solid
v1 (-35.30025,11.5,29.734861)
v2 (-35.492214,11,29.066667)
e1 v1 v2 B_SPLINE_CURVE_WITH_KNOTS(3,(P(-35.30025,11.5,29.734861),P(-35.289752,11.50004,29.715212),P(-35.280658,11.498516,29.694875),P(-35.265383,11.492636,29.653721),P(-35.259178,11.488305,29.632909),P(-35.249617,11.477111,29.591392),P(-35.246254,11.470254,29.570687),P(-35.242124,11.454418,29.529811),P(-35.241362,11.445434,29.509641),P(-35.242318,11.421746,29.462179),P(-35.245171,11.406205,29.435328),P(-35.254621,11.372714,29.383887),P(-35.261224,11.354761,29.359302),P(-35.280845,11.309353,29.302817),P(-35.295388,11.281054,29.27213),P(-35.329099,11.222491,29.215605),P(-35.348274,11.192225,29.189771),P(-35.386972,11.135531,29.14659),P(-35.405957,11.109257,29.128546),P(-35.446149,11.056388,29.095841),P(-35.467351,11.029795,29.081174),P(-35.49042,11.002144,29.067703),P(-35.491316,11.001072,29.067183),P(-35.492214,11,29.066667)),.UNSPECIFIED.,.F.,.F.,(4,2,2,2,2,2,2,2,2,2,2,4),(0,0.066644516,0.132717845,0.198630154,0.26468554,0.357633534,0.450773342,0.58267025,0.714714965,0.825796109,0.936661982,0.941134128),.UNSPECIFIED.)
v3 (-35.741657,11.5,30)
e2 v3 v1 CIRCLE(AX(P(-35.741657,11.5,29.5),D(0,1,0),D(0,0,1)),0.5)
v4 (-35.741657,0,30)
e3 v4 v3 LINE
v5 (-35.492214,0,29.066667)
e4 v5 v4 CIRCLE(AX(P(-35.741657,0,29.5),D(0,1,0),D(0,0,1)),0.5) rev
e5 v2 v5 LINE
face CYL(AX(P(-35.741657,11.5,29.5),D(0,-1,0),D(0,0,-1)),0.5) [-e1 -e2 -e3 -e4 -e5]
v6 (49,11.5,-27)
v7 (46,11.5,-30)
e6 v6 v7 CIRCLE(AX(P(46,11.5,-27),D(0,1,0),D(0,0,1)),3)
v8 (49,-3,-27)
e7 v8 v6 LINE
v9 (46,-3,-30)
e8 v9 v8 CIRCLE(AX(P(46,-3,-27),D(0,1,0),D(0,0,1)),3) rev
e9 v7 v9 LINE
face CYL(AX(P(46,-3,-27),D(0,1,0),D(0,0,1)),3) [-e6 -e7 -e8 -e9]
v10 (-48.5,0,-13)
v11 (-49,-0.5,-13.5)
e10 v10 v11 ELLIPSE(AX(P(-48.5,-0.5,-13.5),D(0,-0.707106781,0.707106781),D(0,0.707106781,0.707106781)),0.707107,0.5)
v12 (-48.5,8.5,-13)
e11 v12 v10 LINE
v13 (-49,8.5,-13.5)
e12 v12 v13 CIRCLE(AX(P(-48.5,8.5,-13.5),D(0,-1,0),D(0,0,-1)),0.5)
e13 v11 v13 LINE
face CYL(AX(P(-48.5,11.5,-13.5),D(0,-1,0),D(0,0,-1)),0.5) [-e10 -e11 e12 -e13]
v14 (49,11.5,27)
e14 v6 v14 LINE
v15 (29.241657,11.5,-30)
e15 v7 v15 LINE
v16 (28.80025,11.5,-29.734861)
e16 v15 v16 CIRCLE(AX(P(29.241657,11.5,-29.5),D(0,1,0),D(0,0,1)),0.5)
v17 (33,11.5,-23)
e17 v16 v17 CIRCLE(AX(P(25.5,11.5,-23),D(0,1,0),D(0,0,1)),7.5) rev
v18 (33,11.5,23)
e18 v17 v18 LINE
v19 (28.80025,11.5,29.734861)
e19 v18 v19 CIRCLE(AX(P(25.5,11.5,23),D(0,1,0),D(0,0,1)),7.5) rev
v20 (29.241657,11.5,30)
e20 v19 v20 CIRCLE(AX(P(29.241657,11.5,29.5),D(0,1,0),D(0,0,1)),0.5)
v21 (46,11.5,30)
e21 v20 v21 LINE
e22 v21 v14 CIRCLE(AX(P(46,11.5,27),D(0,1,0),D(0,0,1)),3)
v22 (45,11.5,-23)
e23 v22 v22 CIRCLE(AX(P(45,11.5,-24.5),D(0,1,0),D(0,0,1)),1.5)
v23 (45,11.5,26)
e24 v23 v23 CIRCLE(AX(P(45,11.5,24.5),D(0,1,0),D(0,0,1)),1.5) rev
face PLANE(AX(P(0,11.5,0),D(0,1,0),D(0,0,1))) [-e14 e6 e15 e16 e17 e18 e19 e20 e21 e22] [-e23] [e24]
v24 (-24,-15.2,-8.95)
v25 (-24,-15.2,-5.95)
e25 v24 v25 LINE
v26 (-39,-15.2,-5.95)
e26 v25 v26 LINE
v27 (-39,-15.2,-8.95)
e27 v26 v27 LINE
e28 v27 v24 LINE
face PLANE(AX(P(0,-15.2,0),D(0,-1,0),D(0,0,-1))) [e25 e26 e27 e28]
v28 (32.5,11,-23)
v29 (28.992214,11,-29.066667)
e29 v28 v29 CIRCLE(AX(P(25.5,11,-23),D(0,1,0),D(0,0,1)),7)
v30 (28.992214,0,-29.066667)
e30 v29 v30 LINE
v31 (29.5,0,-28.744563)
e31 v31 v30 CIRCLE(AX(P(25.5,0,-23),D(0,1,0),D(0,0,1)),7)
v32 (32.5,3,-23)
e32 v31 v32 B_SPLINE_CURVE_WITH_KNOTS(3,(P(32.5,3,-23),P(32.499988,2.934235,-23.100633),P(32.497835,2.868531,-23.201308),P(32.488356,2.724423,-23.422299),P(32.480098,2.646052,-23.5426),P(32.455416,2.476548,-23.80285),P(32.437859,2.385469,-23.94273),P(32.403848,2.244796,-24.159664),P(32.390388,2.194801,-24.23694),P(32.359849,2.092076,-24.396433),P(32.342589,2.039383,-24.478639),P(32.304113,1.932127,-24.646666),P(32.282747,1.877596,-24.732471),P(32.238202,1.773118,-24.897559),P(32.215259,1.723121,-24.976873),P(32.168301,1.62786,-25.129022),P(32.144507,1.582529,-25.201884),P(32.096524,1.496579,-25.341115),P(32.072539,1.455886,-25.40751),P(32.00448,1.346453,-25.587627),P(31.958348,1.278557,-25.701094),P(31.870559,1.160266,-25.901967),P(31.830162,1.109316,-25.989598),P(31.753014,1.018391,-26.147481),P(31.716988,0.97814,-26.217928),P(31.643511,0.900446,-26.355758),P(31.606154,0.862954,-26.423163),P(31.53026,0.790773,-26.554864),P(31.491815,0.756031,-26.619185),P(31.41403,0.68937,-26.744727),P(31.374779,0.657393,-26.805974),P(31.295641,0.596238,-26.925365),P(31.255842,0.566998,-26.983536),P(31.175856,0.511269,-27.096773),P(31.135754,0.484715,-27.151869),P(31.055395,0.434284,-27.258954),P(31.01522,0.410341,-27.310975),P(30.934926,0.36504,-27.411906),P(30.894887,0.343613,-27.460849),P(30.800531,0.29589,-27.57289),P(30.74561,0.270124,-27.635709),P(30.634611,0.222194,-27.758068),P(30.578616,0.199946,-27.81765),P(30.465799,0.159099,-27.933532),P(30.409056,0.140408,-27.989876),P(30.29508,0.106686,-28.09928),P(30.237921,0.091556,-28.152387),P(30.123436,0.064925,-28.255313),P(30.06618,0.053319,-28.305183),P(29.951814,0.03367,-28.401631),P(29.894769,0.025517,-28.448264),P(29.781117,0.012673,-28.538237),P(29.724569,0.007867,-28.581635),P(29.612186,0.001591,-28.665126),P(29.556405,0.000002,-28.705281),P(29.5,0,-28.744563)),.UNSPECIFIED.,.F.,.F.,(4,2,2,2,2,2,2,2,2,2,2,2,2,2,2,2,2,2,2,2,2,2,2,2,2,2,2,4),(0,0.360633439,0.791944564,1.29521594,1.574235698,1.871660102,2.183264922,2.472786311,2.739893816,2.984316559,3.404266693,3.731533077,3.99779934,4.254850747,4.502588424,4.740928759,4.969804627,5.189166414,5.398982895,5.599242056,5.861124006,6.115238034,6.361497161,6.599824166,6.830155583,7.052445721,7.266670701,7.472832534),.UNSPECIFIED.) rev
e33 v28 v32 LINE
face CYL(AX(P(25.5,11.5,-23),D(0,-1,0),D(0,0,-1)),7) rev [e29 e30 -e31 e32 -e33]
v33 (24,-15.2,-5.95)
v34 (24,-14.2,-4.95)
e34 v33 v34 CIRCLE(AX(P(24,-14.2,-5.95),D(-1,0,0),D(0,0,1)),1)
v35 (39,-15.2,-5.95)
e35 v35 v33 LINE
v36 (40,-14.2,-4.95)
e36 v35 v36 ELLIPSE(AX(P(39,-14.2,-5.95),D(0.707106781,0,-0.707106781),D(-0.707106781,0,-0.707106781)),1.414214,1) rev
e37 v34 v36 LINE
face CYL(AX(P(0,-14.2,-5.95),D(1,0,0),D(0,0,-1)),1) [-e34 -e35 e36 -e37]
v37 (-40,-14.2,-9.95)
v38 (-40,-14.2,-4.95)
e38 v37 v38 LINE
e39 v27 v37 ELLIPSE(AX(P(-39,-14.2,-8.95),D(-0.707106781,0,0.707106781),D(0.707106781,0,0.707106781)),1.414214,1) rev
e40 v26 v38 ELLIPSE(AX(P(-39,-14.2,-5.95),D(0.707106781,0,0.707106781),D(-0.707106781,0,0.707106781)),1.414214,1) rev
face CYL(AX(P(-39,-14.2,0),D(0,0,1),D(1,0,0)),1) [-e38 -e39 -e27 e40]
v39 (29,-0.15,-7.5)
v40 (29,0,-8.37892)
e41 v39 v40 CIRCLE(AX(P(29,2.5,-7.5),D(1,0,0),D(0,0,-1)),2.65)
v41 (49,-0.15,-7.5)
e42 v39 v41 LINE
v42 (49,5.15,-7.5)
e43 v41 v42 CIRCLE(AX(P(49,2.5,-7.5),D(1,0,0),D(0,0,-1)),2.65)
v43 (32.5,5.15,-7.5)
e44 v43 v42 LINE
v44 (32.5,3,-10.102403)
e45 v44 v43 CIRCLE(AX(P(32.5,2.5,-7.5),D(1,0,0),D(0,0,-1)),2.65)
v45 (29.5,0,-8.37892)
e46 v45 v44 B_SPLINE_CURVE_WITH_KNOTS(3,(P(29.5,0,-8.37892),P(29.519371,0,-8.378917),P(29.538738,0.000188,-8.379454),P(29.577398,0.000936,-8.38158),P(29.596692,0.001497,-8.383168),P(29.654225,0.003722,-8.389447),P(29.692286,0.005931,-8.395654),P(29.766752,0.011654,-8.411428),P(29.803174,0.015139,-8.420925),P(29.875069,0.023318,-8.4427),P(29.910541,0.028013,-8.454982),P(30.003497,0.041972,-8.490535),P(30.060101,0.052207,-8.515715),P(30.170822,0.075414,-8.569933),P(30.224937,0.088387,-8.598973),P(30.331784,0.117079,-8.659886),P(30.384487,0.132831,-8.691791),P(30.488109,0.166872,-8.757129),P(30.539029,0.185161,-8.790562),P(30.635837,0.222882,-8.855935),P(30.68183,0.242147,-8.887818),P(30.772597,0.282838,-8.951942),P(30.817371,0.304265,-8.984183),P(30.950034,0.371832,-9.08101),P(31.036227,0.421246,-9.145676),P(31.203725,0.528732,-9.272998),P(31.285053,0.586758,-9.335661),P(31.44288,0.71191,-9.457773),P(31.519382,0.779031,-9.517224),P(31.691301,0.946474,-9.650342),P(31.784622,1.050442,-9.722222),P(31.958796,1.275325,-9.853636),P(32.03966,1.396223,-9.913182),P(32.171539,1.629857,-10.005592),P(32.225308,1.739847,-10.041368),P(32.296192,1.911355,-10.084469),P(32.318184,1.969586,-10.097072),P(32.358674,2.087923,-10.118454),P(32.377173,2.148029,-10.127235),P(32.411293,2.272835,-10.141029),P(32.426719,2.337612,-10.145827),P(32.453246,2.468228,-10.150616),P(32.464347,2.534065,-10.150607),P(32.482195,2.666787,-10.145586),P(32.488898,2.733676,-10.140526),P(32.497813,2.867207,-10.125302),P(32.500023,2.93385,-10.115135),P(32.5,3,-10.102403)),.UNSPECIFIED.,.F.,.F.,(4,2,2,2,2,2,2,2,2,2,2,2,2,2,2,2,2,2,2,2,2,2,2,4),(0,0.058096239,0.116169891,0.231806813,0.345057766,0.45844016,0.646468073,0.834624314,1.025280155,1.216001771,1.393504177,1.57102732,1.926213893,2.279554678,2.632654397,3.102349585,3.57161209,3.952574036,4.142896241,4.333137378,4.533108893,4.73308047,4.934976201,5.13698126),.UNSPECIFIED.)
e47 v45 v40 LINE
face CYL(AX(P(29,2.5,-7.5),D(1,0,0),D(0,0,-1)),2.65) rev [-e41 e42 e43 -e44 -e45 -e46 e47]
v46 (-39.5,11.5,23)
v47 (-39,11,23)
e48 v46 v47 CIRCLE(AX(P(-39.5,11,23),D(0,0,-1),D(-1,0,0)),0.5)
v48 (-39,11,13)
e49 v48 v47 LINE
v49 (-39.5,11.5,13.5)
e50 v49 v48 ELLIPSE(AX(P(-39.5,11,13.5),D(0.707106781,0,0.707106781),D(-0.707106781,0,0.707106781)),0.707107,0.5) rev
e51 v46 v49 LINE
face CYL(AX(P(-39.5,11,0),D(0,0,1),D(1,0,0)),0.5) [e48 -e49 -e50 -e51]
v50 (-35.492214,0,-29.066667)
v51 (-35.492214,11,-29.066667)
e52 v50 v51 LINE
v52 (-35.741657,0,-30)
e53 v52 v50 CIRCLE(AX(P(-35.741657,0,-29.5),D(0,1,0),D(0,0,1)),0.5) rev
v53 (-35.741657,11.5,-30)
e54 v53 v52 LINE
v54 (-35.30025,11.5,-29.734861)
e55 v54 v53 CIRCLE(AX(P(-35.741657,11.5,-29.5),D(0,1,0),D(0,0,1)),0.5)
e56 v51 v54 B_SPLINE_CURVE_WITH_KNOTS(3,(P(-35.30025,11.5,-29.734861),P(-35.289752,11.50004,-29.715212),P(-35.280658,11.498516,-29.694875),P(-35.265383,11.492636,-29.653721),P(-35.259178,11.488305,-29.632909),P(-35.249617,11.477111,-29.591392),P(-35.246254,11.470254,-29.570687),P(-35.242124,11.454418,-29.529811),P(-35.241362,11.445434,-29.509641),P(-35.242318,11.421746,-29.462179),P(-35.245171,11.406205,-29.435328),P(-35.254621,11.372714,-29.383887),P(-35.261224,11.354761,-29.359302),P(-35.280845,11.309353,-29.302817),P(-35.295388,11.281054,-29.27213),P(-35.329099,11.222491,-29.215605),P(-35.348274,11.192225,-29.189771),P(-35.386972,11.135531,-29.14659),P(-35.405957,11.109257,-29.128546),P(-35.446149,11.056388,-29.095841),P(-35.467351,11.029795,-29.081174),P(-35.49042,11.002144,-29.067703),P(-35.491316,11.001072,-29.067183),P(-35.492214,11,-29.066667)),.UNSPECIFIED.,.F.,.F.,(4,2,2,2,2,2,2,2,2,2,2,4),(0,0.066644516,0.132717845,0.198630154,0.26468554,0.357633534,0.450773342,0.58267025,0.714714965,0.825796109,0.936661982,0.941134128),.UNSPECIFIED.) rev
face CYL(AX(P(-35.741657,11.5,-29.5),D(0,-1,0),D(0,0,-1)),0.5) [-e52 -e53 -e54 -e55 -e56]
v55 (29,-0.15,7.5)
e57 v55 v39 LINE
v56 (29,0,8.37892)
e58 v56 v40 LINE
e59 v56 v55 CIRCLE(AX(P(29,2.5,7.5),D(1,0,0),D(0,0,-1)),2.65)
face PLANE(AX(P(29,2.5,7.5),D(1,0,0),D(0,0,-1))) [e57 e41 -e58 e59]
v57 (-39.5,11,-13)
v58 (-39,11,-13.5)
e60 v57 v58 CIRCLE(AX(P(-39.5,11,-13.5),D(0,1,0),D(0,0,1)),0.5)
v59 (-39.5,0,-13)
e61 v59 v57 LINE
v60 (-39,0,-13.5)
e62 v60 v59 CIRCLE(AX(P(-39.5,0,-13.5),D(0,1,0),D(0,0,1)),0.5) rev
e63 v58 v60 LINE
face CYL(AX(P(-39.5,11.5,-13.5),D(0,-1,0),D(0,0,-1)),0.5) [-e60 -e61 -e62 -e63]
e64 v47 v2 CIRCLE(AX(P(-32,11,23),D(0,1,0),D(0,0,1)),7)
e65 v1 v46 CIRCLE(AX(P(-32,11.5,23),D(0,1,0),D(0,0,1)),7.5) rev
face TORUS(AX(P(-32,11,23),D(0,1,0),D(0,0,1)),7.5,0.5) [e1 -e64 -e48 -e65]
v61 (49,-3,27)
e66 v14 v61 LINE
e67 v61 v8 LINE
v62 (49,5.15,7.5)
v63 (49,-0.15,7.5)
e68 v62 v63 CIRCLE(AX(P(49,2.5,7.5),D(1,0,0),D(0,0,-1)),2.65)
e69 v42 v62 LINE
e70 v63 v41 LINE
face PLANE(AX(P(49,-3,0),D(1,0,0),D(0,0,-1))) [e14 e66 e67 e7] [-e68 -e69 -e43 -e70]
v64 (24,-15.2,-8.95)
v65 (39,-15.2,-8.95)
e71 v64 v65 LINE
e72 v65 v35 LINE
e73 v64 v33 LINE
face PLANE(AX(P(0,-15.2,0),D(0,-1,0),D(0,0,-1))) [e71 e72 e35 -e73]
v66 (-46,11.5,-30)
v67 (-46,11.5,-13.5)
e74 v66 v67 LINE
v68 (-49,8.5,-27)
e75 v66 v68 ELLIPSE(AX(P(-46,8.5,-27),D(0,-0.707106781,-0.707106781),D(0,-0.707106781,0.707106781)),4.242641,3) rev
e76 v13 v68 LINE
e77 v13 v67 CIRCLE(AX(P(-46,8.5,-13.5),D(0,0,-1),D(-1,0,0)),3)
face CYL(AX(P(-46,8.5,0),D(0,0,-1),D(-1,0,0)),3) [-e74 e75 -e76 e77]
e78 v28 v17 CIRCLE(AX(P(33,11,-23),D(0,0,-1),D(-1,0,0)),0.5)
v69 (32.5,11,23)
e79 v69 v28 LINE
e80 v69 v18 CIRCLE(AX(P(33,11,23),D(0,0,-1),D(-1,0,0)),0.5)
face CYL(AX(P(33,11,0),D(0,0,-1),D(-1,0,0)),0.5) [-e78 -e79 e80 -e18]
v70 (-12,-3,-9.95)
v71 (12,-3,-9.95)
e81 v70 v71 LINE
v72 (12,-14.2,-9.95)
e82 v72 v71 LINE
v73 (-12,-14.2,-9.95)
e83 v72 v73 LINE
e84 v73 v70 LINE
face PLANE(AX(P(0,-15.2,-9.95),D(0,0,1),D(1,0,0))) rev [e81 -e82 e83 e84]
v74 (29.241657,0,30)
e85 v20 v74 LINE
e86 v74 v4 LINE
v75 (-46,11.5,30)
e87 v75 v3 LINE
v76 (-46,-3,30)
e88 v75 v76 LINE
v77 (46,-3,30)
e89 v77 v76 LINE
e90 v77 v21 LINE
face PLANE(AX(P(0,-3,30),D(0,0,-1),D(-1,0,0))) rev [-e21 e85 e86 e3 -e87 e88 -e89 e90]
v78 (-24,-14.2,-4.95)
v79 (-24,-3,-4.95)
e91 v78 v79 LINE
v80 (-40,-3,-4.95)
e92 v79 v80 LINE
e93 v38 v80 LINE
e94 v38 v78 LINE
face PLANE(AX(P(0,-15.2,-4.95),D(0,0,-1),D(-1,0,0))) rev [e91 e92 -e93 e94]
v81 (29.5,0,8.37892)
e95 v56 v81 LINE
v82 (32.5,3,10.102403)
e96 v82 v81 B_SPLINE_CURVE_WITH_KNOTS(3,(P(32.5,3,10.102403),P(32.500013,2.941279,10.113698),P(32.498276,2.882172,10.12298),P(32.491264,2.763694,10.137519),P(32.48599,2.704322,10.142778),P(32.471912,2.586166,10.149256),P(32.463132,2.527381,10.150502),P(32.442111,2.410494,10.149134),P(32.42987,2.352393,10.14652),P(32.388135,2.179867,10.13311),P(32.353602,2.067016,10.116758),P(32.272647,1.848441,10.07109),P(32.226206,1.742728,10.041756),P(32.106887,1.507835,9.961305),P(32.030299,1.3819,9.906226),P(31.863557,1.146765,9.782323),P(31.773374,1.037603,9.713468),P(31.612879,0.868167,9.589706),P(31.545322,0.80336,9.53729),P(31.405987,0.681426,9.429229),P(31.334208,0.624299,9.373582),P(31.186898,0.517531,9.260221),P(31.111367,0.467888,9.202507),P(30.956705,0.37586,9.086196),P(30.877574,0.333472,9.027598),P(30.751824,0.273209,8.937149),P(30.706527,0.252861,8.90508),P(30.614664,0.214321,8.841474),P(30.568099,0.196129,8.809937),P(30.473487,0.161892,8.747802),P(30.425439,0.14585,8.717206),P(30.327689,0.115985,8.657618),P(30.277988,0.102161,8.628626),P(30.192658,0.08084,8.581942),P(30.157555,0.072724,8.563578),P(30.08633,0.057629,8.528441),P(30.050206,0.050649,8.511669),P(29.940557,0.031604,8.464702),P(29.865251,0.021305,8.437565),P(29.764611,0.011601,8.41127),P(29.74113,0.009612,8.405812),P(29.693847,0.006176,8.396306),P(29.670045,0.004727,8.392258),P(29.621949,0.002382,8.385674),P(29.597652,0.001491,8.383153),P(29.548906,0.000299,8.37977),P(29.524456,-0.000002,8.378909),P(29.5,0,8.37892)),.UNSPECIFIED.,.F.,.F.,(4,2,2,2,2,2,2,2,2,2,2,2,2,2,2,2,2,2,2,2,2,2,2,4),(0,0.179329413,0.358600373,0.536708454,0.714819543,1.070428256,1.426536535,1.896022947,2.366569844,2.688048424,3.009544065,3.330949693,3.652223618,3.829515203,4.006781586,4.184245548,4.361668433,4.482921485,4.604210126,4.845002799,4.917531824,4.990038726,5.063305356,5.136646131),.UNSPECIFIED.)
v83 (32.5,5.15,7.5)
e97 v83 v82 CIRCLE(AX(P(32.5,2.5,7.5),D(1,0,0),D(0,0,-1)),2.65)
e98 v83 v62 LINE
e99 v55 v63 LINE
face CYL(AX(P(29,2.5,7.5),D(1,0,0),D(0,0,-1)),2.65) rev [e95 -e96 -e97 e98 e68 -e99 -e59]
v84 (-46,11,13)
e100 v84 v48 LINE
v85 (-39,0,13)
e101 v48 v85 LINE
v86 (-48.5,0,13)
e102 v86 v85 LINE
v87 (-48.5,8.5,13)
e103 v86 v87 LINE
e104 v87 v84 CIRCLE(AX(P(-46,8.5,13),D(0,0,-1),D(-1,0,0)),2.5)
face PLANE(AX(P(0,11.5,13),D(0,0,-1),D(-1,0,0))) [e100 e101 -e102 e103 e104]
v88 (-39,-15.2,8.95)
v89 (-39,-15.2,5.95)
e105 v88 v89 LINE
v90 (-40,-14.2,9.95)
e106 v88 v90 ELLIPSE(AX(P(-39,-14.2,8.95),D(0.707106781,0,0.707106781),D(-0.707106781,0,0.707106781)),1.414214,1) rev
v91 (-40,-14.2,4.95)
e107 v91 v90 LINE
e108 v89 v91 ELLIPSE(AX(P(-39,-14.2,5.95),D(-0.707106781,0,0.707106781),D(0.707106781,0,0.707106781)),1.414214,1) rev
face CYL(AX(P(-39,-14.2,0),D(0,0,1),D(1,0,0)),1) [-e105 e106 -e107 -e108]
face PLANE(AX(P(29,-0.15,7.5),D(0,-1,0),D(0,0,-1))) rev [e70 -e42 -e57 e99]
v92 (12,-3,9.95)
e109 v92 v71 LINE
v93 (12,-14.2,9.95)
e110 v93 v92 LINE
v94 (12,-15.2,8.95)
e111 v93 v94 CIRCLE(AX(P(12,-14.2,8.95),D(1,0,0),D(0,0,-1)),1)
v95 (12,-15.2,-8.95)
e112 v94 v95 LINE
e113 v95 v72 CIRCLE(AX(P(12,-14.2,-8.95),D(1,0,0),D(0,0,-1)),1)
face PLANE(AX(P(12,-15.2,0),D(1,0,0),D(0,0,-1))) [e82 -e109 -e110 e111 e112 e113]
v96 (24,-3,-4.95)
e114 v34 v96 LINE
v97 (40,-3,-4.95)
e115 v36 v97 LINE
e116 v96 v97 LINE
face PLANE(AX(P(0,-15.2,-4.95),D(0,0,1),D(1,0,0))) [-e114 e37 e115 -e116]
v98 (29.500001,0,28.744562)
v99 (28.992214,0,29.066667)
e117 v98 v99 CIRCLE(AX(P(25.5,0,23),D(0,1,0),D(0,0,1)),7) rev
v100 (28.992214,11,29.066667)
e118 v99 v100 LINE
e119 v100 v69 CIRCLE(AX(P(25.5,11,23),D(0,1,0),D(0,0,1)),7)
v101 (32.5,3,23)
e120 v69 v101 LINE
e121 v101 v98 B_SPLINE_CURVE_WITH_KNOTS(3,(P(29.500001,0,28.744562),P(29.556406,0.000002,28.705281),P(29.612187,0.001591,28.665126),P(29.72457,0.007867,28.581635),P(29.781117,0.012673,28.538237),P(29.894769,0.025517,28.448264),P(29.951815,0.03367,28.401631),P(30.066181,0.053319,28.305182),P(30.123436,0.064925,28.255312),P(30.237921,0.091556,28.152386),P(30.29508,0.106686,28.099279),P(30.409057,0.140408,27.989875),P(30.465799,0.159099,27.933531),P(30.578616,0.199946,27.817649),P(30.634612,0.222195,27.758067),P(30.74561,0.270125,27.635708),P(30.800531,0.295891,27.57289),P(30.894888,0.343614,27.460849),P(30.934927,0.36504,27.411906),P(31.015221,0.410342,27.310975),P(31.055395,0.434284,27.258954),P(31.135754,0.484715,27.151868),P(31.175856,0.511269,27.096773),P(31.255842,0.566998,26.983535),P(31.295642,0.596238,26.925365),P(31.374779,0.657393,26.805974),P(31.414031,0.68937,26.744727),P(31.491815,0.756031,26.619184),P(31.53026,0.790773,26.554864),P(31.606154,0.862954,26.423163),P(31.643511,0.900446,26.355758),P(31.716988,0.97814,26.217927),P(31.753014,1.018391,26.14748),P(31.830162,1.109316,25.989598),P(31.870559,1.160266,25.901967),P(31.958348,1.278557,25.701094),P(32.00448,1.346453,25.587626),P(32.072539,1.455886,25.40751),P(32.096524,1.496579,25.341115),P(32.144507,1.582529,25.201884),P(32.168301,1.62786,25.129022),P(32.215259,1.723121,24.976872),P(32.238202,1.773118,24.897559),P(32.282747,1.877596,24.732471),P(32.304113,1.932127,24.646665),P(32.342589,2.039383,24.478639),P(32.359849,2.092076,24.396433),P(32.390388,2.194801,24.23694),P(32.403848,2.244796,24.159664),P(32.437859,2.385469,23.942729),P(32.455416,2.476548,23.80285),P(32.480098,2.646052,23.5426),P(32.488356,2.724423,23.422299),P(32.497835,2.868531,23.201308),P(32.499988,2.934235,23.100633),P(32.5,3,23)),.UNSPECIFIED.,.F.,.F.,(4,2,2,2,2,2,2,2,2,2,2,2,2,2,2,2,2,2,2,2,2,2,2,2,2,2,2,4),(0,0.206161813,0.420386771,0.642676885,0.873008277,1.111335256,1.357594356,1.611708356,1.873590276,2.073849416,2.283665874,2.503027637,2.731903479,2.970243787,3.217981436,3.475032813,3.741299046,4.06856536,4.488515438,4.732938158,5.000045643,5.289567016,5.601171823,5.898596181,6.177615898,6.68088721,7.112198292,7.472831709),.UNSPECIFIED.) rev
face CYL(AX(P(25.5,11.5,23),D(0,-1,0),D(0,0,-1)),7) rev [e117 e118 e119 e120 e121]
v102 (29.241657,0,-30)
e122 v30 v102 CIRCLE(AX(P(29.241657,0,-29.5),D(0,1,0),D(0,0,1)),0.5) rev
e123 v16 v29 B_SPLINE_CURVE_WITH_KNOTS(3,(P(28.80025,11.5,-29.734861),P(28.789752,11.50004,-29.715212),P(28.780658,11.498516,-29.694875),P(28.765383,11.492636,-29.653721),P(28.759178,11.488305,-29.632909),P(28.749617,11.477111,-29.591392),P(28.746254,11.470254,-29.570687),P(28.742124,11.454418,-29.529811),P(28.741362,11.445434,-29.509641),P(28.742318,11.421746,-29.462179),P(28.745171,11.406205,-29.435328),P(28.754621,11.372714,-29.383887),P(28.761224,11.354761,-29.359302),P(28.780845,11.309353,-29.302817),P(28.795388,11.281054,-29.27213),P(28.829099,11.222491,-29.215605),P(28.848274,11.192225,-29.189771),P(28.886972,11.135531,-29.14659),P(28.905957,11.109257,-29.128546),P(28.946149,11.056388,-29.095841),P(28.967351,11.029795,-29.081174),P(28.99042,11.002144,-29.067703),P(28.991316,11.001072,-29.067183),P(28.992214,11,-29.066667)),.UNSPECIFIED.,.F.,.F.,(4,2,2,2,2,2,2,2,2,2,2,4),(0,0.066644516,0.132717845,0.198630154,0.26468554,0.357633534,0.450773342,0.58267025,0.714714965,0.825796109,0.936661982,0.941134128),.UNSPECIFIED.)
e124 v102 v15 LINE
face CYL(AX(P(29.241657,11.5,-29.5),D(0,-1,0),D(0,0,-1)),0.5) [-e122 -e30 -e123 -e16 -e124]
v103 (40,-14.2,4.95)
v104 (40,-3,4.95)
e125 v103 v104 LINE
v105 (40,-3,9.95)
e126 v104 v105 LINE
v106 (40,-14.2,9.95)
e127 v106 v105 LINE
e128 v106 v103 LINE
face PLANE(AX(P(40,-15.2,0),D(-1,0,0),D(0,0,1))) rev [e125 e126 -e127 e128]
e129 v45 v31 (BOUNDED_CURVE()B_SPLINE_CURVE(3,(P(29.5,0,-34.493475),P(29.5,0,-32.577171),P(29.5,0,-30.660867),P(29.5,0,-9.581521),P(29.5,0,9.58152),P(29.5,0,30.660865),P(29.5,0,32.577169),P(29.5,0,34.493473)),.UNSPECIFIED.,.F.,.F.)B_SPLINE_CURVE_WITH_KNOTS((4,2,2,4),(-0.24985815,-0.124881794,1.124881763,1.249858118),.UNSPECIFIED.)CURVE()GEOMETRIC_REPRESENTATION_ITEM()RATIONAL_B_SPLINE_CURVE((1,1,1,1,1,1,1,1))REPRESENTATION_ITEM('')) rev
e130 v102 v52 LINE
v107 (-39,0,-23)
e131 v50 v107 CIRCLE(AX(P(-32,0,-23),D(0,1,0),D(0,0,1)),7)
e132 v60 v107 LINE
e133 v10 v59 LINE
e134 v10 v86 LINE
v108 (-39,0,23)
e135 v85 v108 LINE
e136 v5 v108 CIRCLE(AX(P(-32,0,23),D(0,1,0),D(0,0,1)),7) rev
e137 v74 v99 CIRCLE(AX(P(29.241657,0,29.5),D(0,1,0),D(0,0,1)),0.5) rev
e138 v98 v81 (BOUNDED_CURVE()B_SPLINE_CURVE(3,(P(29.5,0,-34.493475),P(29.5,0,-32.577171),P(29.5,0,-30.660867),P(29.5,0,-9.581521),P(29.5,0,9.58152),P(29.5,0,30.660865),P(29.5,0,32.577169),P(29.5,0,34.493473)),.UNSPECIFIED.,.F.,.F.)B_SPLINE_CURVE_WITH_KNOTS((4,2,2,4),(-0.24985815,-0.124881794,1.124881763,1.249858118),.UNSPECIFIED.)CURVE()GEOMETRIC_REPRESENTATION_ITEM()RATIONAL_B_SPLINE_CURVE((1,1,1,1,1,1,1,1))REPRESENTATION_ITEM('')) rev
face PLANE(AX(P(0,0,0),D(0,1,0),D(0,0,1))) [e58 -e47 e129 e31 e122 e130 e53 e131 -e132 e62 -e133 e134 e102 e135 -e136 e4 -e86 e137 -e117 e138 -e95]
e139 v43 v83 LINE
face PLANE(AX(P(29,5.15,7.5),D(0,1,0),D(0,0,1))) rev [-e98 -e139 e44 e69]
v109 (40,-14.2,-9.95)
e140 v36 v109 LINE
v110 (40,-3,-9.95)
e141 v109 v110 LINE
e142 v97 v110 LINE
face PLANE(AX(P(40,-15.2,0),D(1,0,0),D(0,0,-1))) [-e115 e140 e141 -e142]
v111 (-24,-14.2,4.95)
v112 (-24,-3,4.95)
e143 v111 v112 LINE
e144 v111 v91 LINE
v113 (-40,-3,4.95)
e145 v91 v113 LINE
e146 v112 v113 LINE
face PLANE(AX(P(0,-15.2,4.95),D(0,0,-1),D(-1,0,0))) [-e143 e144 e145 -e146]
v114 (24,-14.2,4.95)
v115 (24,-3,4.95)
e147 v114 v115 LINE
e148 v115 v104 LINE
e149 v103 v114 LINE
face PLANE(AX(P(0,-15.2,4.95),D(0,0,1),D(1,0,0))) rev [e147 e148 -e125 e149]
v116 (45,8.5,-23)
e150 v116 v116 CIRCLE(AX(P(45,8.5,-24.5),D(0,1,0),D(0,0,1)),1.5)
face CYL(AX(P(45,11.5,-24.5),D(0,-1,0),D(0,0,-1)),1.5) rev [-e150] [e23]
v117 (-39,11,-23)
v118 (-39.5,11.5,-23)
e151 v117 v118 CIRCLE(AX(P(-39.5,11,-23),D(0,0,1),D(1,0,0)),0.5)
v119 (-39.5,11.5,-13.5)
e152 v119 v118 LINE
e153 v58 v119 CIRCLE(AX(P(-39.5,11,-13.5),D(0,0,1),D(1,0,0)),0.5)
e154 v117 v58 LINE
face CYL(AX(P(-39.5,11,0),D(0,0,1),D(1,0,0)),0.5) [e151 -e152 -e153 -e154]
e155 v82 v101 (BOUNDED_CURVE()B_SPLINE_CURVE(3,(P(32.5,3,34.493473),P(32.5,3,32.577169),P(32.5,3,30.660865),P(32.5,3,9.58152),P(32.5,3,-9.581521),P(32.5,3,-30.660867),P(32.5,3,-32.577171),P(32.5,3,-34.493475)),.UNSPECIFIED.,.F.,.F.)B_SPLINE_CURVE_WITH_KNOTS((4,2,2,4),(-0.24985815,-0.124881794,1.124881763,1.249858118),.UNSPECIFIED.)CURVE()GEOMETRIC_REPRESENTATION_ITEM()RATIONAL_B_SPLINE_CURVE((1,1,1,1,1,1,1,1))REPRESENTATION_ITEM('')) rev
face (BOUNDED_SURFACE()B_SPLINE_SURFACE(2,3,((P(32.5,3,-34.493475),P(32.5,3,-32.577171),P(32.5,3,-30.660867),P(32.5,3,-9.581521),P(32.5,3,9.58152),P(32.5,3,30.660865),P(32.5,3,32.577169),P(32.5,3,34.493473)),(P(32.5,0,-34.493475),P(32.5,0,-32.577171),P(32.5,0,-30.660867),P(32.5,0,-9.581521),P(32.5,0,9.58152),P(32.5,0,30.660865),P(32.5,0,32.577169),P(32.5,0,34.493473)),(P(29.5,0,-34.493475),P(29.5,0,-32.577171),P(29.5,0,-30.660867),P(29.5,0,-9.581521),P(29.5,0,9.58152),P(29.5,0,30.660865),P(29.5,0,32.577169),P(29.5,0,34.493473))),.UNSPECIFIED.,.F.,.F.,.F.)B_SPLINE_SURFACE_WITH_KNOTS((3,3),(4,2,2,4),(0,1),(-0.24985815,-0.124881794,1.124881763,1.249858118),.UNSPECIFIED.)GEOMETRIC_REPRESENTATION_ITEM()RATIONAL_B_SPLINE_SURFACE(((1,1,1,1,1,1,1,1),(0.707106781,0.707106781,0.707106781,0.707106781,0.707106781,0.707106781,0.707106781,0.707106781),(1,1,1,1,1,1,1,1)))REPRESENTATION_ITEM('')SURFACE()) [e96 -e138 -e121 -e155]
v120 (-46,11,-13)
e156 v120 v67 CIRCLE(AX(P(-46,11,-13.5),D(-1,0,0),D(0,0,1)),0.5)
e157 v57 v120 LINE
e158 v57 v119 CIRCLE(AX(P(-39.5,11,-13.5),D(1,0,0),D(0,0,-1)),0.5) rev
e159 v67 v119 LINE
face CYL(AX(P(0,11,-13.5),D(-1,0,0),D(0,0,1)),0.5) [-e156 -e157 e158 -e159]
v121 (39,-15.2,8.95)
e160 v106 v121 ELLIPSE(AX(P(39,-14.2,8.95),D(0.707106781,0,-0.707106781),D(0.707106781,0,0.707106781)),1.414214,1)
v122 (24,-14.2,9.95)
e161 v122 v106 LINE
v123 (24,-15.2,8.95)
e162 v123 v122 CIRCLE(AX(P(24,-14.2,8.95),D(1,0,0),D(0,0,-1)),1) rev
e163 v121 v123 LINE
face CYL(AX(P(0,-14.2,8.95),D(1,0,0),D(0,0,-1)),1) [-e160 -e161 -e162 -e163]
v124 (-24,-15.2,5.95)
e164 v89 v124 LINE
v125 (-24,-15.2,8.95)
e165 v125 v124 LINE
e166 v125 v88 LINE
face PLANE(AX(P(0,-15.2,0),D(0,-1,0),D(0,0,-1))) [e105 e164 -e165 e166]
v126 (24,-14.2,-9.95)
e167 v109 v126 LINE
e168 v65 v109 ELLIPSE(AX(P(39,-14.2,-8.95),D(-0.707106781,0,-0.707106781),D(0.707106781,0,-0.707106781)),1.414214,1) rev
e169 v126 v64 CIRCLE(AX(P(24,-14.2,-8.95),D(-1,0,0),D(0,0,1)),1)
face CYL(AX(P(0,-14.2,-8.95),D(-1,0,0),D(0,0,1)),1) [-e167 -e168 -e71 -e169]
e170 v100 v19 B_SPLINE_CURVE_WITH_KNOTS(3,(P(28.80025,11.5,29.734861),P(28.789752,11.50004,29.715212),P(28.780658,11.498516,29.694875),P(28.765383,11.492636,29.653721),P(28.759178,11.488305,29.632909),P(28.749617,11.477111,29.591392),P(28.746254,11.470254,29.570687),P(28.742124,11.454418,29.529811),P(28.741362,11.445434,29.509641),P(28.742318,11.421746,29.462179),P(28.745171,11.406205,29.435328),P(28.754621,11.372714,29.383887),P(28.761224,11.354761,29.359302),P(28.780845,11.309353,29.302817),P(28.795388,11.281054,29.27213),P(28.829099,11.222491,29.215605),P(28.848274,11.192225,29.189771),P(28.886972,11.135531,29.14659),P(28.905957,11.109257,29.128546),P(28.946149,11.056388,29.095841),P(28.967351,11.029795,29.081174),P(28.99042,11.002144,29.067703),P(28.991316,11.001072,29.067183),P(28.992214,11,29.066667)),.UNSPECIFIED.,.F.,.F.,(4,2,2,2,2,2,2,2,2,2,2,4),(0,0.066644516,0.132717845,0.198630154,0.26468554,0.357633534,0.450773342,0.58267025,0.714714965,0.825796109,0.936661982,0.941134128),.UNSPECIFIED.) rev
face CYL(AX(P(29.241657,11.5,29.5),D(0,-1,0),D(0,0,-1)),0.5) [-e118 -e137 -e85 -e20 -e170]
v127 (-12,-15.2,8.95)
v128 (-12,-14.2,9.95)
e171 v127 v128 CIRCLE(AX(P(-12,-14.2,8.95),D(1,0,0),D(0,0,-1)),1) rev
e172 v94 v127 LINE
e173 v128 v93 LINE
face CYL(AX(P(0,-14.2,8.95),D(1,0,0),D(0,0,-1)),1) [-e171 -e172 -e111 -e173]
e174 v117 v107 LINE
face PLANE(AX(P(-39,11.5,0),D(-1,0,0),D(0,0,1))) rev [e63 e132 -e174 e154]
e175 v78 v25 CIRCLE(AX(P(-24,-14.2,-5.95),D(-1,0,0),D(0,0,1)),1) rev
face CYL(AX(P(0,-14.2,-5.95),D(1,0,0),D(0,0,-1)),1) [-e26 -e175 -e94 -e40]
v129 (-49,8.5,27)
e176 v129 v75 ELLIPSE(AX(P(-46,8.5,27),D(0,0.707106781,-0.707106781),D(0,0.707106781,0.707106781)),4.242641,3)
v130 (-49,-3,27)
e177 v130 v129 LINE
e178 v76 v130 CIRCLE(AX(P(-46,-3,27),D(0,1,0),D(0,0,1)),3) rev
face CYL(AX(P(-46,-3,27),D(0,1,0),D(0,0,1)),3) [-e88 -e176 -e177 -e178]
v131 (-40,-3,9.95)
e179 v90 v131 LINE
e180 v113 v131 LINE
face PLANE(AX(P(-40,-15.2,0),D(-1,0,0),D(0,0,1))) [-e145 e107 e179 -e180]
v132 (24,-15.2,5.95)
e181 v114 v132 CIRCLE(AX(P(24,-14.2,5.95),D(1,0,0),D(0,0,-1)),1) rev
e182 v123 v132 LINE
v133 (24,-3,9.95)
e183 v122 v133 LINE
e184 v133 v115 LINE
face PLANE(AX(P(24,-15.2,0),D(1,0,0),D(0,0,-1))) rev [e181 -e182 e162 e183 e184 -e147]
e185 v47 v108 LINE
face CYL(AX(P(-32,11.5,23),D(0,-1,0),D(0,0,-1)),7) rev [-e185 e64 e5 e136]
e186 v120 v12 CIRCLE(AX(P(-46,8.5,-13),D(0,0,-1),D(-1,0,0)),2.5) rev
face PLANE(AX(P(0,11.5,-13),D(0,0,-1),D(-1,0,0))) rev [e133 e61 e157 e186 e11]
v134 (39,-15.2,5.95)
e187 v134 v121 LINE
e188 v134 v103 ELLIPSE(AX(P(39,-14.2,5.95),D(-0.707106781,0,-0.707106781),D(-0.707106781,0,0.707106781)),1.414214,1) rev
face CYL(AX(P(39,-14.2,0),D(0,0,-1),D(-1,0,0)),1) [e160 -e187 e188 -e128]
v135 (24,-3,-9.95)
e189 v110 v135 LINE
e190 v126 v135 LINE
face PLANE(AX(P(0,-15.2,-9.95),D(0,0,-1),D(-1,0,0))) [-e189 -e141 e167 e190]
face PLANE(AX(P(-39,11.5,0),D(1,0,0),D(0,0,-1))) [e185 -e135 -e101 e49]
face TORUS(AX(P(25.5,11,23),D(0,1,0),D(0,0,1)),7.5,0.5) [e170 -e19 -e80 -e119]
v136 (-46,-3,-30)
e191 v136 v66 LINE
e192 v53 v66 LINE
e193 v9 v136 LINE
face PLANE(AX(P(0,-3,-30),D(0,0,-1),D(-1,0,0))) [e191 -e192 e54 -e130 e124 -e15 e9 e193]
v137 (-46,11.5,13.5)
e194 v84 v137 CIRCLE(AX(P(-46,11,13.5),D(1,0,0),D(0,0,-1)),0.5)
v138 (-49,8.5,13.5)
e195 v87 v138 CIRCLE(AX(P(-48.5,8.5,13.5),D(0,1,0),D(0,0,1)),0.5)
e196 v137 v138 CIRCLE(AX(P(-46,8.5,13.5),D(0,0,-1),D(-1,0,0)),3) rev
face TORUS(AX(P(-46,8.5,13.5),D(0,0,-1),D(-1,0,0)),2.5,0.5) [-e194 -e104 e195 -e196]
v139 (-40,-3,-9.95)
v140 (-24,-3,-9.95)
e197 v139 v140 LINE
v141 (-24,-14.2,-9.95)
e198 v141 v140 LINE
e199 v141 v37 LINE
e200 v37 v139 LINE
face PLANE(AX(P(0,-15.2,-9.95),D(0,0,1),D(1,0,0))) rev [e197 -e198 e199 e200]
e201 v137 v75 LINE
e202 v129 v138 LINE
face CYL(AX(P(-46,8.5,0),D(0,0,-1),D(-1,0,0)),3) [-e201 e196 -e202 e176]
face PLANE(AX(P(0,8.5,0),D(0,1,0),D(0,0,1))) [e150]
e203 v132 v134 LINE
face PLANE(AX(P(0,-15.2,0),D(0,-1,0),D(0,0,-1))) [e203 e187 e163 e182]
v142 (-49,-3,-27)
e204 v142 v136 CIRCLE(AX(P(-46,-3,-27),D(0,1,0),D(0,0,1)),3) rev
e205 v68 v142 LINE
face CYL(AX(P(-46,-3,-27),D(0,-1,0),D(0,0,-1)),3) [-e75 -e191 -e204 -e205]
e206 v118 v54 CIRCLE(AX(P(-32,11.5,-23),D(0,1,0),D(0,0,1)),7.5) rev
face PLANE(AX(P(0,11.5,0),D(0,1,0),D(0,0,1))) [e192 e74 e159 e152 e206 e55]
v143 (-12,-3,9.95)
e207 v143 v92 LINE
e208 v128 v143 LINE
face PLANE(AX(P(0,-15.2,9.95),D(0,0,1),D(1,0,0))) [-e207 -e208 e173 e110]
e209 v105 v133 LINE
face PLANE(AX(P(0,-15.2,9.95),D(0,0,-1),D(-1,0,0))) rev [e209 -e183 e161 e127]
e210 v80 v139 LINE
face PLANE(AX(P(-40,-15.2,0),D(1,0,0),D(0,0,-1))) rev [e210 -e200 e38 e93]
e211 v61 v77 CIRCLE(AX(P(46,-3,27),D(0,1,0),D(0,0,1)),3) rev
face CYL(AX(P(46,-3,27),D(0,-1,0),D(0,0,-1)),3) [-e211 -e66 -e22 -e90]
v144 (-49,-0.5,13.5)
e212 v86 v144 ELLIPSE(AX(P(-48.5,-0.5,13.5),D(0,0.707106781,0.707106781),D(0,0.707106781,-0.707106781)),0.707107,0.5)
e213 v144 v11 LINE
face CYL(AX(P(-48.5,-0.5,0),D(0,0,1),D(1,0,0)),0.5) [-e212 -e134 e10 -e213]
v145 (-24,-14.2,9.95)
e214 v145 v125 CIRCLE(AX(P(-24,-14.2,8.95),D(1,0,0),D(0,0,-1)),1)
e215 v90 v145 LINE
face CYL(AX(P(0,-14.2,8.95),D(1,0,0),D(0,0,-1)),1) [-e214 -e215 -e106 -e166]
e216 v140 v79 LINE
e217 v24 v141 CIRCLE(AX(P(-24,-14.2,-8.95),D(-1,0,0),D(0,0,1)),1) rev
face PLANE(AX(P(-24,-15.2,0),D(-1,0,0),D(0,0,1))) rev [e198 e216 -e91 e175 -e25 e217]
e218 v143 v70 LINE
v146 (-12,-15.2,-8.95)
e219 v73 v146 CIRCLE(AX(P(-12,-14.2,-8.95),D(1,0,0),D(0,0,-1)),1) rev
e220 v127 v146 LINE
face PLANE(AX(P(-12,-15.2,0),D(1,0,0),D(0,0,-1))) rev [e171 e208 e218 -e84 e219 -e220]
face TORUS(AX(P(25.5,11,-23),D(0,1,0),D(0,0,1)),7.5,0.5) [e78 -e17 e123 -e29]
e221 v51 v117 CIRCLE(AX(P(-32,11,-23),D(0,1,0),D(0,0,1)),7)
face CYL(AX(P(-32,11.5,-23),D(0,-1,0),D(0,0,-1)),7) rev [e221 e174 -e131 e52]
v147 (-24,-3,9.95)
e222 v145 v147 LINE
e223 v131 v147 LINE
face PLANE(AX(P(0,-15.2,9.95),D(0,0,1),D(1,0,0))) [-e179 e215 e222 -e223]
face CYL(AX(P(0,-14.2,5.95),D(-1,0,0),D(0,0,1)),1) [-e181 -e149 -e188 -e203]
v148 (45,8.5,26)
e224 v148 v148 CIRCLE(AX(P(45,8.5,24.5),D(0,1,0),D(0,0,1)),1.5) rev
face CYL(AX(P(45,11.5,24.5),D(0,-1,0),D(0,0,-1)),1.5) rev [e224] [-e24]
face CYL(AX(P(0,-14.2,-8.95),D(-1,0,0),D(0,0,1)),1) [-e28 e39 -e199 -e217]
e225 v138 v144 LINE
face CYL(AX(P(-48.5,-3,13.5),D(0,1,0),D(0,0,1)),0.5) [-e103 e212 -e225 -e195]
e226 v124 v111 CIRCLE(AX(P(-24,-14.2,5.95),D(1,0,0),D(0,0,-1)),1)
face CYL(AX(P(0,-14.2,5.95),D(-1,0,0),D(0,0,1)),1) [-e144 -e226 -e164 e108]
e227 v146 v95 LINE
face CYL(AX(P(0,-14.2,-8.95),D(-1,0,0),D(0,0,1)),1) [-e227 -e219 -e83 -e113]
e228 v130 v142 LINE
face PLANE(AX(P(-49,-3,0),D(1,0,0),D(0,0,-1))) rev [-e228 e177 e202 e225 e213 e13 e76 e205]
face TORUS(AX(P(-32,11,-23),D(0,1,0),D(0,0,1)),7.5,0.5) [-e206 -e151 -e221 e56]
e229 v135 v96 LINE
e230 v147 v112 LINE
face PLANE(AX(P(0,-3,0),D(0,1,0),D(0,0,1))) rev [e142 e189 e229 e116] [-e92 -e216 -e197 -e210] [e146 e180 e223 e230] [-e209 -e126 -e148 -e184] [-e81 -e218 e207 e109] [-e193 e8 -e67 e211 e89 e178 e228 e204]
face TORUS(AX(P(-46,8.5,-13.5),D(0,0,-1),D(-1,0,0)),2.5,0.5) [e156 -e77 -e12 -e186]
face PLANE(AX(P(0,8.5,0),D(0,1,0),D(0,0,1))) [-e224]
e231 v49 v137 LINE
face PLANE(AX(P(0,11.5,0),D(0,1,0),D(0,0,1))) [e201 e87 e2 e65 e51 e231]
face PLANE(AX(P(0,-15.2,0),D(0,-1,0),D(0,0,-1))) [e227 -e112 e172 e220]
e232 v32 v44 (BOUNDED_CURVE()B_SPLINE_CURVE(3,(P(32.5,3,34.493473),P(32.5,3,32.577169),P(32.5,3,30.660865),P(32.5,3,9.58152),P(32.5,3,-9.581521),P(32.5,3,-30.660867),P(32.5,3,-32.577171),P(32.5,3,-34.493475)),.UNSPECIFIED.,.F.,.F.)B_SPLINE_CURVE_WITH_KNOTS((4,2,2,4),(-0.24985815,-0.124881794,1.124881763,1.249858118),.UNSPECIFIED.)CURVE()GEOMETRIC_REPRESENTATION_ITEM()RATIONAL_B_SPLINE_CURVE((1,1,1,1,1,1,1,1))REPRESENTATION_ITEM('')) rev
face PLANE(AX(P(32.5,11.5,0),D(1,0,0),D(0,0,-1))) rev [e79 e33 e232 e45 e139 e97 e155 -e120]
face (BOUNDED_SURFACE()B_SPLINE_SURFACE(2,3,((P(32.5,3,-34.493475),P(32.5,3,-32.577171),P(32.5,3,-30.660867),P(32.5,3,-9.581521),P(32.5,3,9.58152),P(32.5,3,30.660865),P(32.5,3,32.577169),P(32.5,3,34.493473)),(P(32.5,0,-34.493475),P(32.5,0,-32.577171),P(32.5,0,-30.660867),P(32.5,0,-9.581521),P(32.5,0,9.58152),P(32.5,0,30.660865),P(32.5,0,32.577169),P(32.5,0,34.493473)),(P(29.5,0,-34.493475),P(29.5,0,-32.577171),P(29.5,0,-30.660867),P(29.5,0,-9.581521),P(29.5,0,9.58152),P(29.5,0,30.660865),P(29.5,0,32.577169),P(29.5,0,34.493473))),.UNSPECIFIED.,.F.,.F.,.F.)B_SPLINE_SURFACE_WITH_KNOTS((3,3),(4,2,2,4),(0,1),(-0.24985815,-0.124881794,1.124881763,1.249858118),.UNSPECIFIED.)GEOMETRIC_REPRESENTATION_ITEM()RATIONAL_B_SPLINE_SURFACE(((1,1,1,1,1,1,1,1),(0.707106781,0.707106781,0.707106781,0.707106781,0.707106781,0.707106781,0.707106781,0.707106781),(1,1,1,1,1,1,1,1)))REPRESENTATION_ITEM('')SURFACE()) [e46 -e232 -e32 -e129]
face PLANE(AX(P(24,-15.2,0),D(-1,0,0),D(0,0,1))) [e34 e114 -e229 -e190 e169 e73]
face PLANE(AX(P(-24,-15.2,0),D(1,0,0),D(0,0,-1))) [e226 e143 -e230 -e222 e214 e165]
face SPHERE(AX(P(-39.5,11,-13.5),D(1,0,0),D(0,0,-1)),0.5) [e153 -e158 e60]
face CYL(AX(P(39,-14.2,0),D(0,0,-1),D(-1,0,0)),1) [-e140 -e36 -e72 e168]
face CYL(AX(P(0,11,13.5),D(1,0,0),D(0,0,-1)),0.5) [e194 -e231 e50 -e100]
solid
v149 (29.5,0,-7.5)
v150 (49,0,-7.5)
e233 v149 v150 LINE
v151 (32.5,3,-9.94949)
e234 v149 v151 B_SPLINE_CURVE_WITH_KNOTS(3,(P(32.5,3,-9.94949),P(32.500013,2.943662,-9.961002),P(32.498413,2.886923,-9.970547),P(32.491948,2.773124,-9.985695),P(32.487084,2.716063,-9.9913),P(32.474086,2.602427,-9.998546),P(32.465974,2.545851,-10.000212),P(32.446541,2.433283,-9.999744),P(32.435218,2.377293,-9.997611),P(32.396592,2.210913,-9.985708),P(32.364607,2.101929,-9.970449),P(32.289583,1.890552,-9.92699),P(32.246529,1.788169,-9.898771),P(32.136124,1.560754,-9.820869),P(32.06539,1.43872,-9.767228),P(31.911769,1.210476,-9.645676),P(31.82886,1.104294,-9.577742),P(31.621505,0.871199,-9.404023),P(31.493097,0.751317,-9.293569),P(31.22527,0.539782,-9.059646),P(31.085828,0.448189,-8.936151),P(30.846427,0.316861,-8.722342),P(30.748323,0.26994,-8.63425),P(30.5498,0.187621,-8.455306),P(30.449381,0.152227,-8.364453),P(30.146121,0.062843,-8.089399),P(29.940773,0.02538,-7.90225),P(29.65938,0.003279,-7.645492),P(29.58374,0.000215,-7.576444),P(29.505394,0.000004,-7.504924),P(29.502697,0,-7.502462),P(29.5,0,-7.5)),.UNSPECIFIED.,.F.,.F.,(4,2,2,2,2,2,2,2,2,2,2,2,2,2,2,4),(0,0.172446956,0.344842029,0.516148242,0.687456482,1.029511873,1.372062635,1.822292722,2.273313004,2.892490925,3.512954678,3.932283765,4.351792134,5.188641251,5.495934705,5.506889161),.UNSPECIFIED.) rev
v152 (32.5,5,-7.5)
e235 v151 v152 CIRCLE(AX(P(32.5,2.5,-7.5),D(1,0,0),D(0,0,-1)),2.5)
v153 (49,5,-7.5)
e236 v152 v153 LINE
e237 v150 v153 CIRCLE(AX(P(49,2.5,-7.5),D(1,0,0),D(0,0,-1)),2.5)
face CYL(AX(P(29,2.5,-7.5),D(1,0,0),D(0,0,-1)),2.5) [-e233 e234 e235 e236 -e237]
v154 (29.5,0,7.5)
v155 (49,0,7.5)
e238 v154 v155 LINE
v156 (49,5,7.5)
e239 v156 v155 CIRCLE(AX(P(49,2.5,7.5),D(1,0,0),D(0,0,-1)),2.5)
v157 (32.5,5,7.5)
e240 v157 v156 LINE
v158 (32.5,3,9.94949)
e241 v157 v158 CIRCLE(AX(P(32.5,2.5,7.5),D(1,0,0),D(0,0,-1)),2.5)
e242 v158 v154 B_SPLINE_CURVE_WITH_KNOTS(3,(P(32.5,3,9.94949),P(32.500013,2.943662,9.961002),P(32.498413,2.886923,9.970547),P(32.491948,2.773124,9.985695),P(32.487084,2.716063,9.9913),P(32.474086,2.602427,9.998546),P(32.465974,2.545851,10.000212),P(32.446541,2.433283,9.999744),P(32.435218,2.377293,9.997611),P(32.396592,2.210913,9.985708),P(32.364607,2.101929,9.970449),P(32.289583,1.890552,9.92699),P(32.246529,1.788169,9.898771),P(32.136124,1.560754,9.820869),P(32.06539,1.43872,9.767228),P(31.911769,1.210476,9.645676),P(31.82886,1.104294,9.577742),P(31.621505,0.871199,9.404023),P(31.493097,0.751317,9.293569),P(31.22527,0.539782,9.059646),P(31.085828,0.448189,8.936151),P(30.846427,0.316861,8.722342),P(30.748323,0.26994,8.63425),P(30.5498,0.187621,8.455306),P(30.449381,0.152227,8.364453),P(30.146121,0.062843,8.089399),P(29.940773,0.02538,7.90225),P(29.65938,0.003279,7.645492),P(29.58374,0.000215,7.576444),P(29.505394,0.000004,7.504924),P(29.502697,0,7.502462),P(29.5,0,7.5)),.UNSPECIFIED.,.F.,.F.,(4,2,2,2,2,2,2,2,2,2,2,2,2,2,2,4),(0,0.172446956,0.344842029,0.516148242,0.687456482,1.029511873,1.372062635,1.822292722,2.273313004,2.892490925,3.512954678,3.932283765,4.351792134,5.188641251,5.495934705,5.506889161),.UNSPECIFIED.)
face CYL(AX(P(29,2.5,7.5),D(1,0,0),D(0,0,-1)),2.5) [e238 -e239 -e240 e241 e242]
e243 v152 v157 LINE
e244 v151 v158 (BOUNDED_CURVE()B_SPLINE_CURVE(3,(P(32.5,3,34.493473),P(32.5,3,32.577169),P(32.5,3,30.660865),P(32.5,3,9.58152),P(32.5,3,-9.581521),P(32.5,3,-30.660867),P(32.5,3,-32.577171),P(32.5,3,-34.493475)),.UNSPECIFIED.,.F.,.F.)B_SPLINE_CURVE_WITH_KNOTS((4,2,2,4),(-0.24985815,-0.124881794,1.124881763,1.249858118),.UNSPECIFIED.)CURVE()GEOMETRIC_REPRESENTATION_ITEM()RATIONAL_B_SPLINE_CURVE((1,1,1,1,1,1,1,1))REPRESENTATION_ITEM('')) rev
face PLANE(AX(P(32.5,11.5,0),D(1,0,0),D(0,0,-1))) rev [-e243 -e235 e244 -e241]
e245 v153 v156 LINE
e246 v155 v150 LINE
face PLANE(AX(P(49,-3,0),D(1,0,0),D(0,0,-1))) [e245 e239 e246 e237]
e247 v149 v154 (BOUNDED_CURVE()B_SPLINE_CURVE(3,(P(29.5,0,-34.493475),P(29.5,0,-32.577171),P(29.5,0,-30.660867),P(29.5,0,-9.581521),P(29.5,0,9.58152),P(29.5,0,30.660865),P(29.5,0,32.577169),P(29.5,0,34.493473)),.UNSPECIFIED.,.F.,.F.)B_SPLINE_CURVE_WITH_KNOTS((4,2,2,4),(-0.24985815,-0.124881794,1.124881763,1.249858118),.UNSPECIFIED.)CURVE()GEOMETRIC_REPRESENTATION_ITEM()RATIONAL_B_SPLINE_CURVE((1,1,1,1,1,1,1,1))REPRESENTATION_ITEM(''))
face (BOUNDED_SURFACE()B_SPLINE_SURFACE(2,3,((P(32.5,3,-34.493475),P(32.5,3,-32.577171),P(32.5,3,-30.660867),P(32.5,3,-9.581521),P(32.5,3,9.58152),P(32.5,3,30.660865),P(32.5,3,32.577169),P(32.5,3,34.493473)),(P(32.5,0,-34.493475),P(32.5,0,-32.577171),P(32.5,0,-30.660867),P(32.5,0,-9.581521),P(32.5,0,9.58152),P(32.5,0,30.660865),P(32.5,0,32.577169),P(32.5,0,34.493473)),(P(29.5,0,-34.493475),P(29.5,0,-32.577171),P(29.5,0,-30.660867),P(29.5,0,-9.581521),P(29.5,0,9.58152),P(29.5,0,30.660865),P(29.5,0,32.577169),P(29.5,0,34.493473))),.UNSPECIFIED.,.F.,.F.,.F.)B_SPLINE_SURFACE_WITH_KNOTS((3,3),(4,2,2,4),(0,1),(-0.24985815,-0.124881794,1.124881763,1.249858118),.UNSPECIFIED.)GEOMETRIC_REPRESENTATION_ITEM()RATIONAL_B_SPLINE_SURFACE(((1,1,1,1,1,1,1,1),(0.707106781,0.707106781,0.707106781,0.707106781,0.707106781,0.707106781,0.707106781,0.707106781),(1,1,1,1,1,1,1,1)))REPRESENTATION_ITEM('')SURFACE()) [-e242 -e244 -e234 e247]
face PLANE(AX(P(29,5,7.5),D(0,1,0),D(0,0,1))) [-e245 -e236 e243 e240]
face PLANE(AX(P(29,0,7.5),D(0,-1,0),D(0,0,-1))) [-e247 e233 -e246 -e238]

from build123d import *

# Parameters (mm, degrees)
SKETCH1_W           = 13.75
SKETCH1_H           = 49
SKETCH1_W_2         = 16.25
BOSS_EXTRUDE1_DEPTH = 3
SKETCH8_W           = 16
SKETCH8_H           = 5
SKETCH8_W_2         = 12
SKETCH8_H_2         = 9.95
BOSS_EXTRUDE4_DEPTH = 12.2
SKETCH10_R          = 1.5
BOSS_EXTRUDE5_DEPTH = 11.5
SKETCH10_3_R        = 1.5
BOSS_EXTRUDE6_DEPTH = 8.5
BOSS_EXTRUDE8_DEPTH = 11.5
FILLET1_R           = 3
FILLET4_START       = -30
FILLET4_DEPTH       = 60
FILLET6_R           = 1
CUT_EXTRUDE1_DEPTH  = 20
FILLET7_R           = 0.5


with BuildPart() as part:
    # Sketch1 → Boss-Extrude1 (new body)
    with BuildSketch(Plane(origin=(2.725879216, 0, 0), x_dir=(0, 0, -1), z_dir=(0, -1, 0))):
        with Locations((-23.125, 21.774120784)):
            Rectangle(SKETCH1_W, SKETCH1_H)
        with Locations((-23.125, -27.225879216)):
            Rectangle(SKETCH1_W, SKETCH1_H)
        with Locations((-9.375, 21.774120784)):
            Rectangle(SKETCH1_W, SKETCH1_H)
        with Locations((-9.375, -27.225879216)):
            Rectangle(SKETCH1_W, SKETCH1_H)
        with Locations((5.625, 21.774120784)):
            Rectangle(SKETCH1_W_2, SKETCH1_H)
        with Locations((5.625, -27.225879216)):
            Rectangle(SKETCH1_W_2, SKETCH1_H)
        with Locations((21.875, 21.774120784)):
            Rectangle(SKETCH1_W_2, SKETCH1_H)
        with Locations((21.875, -27.225879216)):
            Rectangle(SKETCH1_W_2, SKETCH1_H)
    extrude(amount=BOSS_EXTRUDE1_DEPTH)

    # Sketch8 → Boss-Extrude4 (add)
    with BuildSketch(Plane(origin=(0, -3, -2), x_dir=(-1, 0, 0), z_dir=(0, 1, 0))):
        with Locations((-32, 9.45)):
            Rectangle(SKETCH8_W, SKETCH8_H)
        with Locations((-32, -5.45)):
            Rectangle(SKETCH8_W, SKETCH8_H)
        with Locations((6, -2.975)):
            Rectangle(SKETCH8_W_2, SKETCH8_H_2)
        with Locations((-6, -2.975)):
            Rectangle(SKETCH8_W_2, SKETCH8_H_2)
        with Locations((-6, 6.975)):
            Rectangle(SKETCH8_W_2, SKETCH8_H_2)
        with Locations((6, 6.975)):
            Rectangle(SKETCH8_W_2, SKETCH8_H_2)
        with Locations((32, -5.45)):
            Rectangle(SKETCH8_W, SKETCH8_H)
        with Locations((32, 9.45)):
            Rectangle(SKETCH8_W, SKETCH8_H)
    extrude(amount=-BOSS_EXTRUDE4_DEPTH)

    # Sketch10 → Boss-Extrude5 (add)
    with BuildSketch(Plane(origin=(0, 0, 0), x_dir=(1, 0, 0), z_dir=(0, 1, 0))):
        with BuildLine():
            Line((49, 30), (25.5, 30))
            ThreePointArc((25.5, 30), (30.449747468, 27.949747468), (32.5, 23))
            Line((32.5, 23), (32.5, -23))
            ThreePointArc((32.5, -23), (30.449747483, -27.949747453), (25.500000042, -30))
            Line((25.500000042, -30), (49, -30))
            Line((49, -30), (49, 30))
        make_face()
        with Locations(Location((45, 24.5, 0), (0, 0, 270))):
            Circle(SKETCH10_R, mode=Mode.SUBTRACT)
        with Locations(Location((45, -24.5, 0), (0, 0, 270))):
            Circle(SKETCH10_R, mode=Mode.SUBTRACT)
    extrude(amount=BOSS_EXTRUDE5_DEPTH)

    # Sketch10<3> → Boss-Extrude6 (add)
    with BuildSketch(Plane(origin=(0, 0, 0), x_dir=(1, 0, 0), z_dir=(0, 1, 0))):
        with Locations(Location((45, 24.5, 0), (0, 0, 270))):
            Circle(SKETCH10_3_R)
        with Locations(Location((45, -24.5, 0), (0, 0, 270))):
            Circle(SKETCH10_3_R)
    extrude(amount=BOSS_EXTRUDE6_DEPTH)

    # Sketch14 → Boss-Extrude8 (add)
    with BuildSketch(Plane(origin=(0, 0, 0), x_dir=(1, 0, 0), z_dir=(0, 1, 0))):
        with BuildLine():
            Line((-49, 30), (-49, 13))
            Line((-49, 13), (-39, 13))
            Line((-39, 13), (-39, 23))
            ThreePointArc((-39, 23), (-36.949747468, 27.949747468), (-32, 30))
            Line((-32, 30), (-49, 30))
        make_face()
        with BuildLine():
            Line((-39, -13), (-49, -13))
            Line((-49, -13), (-49, -30))
            Line((-49, -30), (-32, -30))
            ThreePointArc((-32, -30), (-36.949747468, -27.949747468), (-39, -23))
            Line((-39, -23), (-39, -13))
        make_face()
    extrude(amount=BOSS_EXTRUDE8_DEPTH)

    # Fillet1
    fillet1_edges = [part.edges().sort_by_distance(p)[0] for p in [
        (49, 4.25, -30),
        (49, 4.25, 30),
        (-49, 4.25, 30),
        (-49, 4.25, -30),
        (-49, 11.5, -21.5),
        (-49, 11.5, 21.5),
    ]]
    fillet(fillet1_edges, radius=FILLET1_R)

    # Fillet4: read off the stored shape, not the designer's step
    # Fillet4 outline → Fillet4 (add)
    with BuildSketch(Plane.XY.offset(FILLET4_START)):
        with BuildLine():
            Line((32.5, 0), (32.5, 3))
            add(Edge.make_bspline(
                [(32.5, 3), (32.5, 0), (29.5, 0)],
                knots=[0, 0, 0, 1, 1, 1], degree=2, weights=[1, 0.707106781, 1]))
            Line((29.5, 0), (32.5, 0))
        make_face()
    extrude(amount=FILLET4_DEPTH)

    # Fillet6
    fillet6_edges = [part.edges().sort_by_distance(p)[0] for p in [
        (32, -15.2, 9.95),
        (32, -15.2, 4.95),
        (40, -15.2, 7.45),
        (32, -15.2, -4.95),
        (32, -15.2, -9.95),
        (40, -15.2, -7.45),
        (0, -15.2, 9.95),
        (0, -15.2, -9.95),
        (-32, -15.2, -9.95),
        (-32, -15.2, -4.95),
        (-40, -15.2, -7.45),
        (-32, -15.2, 4.95),
        (-32, -15.2, 9.95),
        (-40, -15.2, 7.45),
    ]]
    fillet(fillet6_edges, radius=FILLET6_R)

    # Sketch16 → Cut-Extrude1 (cut)
    with BuildSketch(Plane(origin=(49, 0, 0), x_dir=(0, 0, -1), z_dir=(1, 0, 0))):
        with BuildLine():
            Line((-7.5, 5.15), (7.5, 5.15))
            ThreePointArc((7.5, 5.15), (10.15, 2.5), (7.5, -0.15))
            Line((7.5, -0.15), (-7.5, -0.15))
            ThreePointArc((-7.5, -0.15), (-10.15, 2.5), (-7.5, 5.15))
        make_face()
        with BuildLine():
            Line((-7.5, 5), (7.5, 5))
            ThreePointArc((7.5, 5), (10, 2.5), (7.5, 0))
            Line((7.5, 0), (-7.5, 0))
            ThreePointArc((-7.5, 0), (-10, 2.5), (-7.5, 5))
        make_face(mode=Mode.SUBTRACT)
    extrude(amount=-CUT_EXTRUDE1_DEPTH, mode=Mode.SUBTRACT)


with BuildPart() as cut_extrude1_piece_1:
    # of the separate pieces the step leaves, piece 1, a body of its own (cut_extrude1_pieces)
    add(part.part.solids().sort_by_distance((-24, -14.2, 9.95))[0])

    # Fillet7
    fillet7_edges = [cut_extrude1_piece_1.edges().sort_by_distance(p)[0] for p in [
        (-36.949747468, 11.5, 27.949747468),
        (-32, 5.75, 30),
        (-42.5, 11.5, 13),
        (-48.121320344, 10.621320344, 13),
        (-36.949747468, 11.5, -27.949747468),
        (-39, 11.5, 18),
        (30.449747468, 11.5, -27.949747468),
        (30.449747483, 11.5, 27.949747453),
        (-42.5, 11.5, -13),
        (-48.121320344, 10.621320344, -13),
        (-49, 4.25, 13),
        (-49, 0, 0),
        (-39, 11.5, -18),
        (32.5, 11.5, 0),
        (25.500000042, 5.75, 30),
        (25.5, 5.75, -30),
        (-32, 5.75, -30),
        (-39, 5.75, -13),
        (-49, 4.25, -13),
    ]]
    fillet(fillet7_edges, radius=FILLET7_R)


with BuildPart() as cut_extrude1_piece_2:
    # of the separate pieces the step leaves, piece 2, a body of its own (cut_extrude1_pieces)
    add(part.part.solids().sort_by_distance((49, 0, -7.5))[0])


solid = Compound([cut_extrude1_piece_1.part, cut_extrude1_piece_2.part])
